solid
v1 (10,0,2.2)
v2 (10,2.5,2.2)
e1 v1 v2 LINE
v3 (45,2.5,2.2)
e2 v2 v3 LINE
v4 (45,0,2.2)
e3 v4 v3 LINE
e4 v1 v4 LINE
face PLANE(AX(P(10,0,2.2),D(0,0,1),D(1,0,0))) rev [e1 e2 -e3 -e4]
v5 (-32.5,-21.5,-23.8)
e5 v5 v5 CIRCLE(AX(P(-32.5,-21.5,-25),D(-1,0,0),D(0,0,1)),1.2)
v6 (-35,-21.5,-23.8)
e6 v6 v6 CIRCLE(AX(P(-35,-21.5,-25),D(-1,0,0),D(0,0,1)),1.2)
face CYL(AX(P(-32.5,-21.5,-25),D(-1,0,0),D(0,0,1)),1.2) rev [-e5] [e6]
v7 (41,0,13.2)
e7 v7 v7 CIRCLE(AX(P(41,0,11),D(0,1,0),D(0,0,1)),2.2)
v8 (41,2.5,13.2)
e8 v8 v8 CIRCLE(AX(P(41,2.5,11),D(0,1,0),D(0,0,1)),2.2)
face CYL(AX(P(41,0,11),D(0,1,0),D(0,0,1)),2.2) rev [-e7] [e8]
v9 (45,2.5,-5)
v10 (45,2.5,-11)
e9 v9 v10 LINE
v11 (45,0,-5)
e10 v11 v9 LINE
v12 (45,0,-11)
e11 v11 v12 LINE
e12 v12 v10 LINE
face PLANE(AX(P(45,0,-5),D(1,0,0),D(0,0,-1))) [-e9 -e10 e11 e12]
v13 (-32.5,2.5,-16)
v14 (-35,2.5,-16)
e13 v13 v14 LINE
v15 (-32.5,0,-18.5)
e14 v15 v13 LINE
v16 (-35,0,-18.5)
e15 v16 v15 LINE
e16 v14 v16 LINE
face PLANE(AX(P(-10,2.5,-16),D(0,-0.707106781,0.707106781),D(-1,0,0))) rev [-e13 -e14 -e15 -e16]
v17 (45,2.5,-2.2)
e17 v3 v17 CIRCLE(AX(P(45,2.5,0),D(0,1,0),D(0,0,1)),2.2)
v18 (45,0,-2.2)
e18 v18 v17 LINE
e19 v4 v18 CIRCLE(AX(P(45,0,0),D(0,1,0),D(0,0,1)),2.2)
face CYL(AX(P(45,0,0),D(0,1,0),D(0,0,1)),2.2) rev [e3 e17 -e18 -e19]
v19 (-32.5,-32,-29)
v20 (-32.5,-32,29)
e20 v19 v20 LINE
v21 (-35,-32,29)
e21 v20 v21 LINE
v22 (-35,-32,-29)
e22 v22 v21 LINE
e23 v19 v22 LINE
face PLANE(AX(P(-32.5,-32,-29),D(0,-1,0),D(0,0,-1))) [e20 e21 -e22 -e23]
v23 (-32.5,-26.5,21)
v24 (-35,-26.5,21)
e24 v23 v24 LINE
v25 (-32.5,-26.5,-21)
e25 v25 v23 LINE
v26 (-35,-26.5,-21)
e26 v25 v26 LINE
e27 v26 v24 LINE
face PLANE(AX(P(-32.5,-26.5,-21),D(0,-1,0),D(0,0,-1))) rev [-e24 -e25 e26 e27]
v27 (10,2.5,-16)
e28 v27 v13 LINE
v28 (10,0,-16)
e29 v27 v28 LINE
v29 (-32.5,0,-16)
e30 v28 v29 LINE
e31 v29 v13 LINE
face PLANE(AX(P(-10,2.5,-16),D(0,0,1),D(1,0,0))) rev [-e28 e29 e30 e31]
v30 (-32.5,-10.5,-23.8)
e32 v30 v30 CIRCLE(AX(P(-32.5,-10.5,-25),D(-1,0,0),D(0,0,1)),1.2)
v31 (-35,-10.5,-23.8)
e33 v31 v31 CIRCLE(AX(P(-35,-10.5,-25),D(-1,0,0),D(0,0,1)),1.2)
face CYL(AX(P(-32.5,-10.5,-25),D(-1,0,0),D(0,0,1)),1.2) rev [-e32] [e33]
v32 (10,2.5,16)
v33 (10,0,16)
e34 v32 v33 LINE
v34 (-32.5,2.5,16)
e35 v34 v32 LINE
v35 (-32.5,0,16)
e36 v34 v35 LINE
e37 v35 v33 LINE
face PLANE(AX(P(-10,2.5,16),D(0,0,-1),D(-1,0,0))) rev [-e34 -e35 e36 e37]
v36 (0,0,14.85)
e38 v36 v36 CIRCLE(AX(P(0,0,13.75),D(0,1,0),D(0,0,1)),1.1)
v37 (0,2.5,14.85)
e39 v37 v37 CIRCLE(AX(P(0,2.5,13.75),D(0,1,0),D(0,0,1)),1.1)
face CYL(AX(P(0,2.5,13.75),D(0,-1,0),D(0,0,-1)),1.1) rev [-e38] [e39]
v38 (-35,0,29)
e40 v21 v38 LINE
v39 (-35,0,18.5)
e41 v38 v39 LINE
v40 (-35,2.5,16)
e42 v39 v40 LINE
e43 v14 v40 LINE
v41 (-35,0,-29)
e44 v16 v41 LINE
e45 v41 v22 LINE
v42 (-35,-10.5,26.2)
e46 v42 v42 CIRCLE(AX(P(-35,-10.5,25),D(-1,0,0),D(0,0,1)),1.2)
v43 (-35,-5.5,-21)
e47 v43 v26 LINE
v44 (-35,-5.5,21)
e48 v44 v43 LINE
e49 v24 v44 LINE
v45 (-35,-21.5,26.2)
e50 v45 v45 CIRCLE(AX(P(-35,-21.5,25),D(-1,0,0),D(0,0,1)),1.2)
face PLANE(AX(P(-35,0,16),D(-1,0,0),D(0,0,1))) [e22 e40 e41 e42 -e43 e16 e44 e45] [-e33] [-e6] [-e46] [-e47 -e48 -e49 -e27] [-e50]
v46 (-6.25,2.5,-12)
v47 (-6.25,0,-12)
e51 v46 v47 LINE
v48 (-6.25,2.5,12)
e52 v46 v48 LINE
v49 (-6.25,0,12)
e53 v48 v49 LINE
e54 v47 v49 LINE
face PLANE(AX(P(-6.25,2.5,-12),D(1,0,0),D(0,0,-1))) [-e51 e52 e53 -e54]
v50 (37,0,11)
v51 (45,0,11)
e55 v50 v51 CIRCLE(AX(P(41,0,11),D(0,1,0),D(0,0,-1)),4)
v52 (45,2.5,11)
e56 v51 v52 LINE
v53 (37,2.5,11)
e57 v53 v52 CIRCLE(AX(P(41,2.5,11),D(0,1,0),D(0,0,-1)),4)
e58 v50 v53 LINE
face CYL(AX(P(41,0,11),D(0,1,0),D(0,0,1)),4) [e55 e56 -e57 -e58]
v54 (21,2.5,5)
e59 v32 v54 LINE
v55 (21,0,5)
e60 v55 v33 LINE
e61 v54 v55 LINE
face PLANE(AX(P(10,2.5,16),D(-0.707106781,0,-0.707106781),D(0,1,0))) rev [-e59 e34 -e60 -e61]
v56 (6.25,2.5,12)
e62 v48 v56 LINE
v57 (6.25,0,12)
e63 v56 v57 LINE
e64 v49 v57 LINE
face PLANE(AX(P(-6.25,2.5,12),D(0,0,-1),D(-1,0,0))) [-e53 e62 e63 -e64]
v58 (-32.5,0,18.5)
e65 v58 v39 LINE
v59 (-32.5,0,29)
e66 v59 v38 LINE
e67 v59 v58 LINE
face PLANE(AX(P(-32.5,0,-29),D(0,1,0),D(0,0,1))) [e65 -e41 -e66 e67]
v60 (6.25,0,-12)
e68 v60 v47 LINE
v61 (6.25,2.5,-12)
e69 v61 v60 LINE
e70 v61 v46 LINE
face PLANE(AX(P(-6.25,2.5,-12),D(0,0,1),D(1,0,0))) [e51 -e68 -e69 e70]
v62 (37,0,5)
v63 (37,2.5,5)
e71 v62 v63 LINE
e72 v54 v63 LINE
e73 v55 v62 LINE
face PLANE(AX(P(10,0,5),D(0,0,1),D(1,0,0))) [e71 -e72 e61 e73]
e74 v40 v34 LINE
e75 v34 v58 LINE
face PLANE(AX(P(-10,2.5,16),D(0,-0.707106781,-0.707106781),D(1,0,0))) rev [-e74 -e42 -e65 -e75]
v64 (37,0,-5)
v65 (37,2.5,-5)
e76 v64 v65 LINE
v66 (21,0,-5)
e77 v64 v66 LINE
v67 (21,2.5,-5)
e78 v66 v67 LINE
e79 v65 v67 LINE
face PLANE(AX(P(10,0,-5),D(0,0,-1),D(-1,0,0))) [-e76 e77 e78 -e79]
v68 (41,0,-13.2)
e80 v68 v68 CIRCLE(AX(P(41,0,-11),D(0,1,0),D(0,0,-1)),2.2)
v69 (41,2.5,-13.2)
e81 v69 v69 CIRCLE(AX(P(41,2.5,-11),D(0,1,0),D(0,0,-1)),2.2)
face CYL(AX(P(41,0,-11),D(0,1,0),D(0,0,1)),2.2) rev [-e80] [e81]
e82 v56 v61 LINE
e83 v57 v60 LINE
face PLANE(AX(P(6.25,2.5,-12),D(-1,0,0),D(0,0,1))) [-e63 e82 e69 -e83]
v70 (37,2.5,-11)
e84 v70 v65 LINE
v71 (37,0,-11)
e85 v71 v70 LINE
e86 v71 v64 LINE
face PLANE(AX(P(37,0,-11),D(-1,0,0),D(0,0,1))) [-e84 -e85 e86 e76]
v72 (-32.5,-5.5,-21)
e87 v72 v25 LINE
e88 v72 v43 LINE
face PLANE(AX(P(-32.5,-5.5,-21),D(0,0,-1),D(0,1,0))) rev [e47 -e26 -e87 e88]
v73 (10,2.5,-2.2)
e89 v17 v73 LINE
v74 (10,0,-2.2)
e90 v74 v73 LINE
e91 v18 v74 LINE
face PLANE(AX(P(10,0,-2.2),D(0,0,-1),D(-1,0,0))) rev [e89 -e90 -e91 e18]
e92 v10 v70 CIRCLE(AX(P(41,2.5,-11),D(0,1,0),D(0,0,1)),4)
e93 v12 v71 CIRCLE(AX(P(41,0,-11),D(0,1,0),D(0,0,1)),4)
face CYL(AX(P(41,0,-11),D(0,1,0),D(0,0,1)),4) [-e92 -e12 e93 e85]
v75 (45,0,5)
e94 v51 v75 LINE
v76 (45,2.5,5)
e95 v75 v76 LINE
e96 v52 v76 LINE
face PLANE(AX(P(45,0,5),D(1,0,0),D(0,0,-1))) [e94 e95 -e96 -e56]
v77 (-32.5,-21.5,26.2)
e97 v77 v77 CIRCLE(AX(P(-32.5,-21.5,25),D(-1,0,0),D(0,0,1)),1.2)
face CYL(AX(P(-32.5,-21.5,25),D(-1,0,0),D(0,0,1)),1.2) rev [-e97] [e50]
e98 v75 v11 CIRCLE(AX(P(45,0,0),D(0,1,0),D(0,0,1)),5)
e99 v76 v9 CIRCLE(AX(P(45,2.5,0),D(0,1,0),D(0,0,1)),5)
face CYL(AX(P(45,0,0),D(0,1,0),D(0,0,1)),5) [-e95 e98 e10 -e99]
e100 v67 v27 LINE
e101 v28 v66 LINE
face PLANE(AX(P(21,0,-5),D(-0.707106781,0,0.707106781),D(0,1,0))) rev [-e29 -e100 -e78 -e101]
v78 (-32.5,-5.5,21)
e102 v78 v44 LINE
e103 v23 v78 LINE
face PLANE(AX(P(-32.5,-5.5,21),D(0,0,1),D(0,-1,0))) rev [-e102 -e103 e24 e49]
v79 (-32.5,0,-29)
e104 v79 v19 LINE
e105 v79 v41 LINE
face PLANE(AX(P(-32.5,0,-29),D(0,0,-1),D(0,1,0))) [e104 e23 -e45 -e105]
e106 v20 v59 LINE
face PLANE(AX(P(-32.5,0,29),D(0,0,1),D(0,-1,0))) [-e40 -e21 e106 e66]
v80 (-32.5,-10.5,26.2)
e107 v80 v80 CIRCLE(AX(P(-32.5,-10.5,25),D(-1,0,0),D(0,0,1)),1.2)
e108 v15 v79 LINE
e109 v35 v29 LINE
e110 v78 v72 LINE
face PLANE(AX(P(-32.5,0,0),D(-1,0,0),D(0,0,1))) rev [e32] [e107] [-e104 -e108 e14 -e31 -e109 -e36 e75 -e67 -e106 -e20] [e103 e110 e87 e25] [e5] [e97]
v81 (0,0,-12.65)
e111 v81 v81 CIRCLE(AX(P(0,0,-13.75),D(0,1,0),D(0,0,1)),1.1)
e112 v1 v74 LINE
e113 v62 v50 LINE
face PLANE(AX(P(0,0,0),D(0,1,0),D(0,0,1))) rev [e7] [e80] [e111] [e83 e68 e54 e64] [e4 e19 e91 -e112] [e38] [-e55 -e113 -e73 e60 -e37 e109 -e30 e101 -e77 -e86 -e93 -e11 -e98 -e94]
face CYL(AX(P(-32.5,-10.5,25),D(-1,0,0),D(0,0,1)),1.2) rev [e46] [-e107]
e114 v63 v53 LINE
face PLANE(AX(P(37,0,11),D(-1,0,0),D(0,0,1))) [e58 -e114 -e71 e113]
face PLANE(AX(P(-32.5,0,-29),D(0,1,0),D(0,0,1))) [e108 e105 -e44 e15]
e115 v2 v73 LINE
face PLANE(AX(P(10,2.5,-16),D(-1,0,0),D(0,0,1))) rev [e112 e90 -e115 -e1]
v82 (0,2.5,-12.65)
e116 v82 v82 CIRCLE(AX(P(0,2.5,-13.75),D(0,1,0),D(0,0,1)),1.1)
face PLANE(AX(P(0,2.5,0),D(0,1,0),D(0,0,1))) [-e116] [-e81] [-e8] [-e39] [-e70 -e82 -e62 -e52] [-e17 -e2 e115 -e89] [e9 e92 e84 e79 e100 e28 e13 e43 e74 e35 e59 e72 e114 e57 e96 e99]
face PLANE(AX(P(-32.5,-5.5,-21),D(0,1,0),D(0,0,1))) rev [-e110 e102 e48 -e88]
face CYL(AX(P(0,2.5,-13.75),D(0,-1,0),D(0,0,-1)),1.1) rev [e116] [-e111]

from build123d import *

# Parameters (mm, degrees)
SKETCH1_W           = 20
SKETCH1_H           = 32
SKETCH1_R           = 1.1
SKETCH1_W_2         = 12.5
SKETCH1_H_2         = 24
BOSS_EXTRUDE1_DEPTH = 2.5
BOSS_EXTRUDE2_DEPTH = 2.5
CHAMFER1_SIZE       = 11
SKETCH3_R           = 2.2
BOSS_EXTRUDE3_DEPTH = 2.5
SKETCH4_W           = 25
SKETCH4_H           = 32
BOSS_EXTRUDE4_DEPTH = 2.5
SKETCH5_W           = 58
SKETCH5_H           = 32
SKETCH5_R           = 1.2
SKETCH5_W_2         = 42
SKETCH5_H_2         = 21
BOSS_EXTRUDE5_DEPTH = 2.5
CHAMFER2_SIZE       = 2.5


with BuildPart() as part:
    # Sketch1 → Boss-Extrude1 (new body)
    with BuildSketch(Plane(origin=(0, 0, 0), x_dir=(1, 0, 0), z_dir=(0, 1, 0))):
        Rectangle(SKETCH1_W, SKETCH1_H)
        with Locations(Location((0, -13.75, 0), (0, 0, 270))):
            Circle(SKETCH1_R, mode=Mode.SUBTRACT)
        with Locations(Location((0, 13.75, 0), (0, 0, 270))):
            Circle(SKETCH1_R, mode=Mode.SUBTRACT)
        Rectangle(SKETCH1_W_2, SKETCH1_H_2, mode=Mode.SUBTRACT)
    extrude(amount=BOSS_EXTRUDE1_DEPTH)

    # Sketch2 → Boss-Extrude2 (add)
    with BuildSketch(Plane(origin=(0, 2.5, 0), x_dir=(1, 0, 0), z_dir=(0, 1, 0))):
        with BuildLine():
            Line((10, 5), (45, 5))
            ThreePointArc((45, 5), (50, 0), (45, -5))
            Line((45, -5), (10, -5))
            ThreePointArc((10, -5), (7.942810861, -4.557189139), (6.25, -3.307189139))
            Line((6.25, -3.307189139), (6.25, 3.307189139))
            ThreePointArc((6.25, 3.307189139), (7.942810861, 4.557189139), (10, 5))
        make_face()
        with BuildLine():
            Line((10, 2.2), (45, 2.2))
            ThreePointArc((45, 2.2), (47.2, 0), (45, -2.2))
            Line((45, -2.2), (10, -2.2))
            ThreePointArc((10, -2.2), (7.8, 0), (10, 2.2))
        make_face(mode=Mode.SUBTRACT)
    extrude(amount=-BOSS_EXTRUDE2_DEPTH)

    # Chamfer1
    chamfer1_edges = [part.edges().sort_by_distance(p)[0] for p in [
        (10, 1.25, 5),
        (10, 1.25, -5),
    ]]
    chamfer(chamfer1_edges, length=CHAMFER1_SIZE - 0.0001)  # a hair under: the kernel refuses the full size

    # Sketch3 → Boss-Extrude3 (add)
    # profile 1 of 2: a face of its own
    with BuildSketch(Plane(origin=(0, 2.5, 0), x_dir=(1, 0, 0), z_dir=(0, 1, 0))):
        with BuildLine():
            Line((45, -5), (45, -11))
            ThreePointArc((45, -11), (41, -15), (37, -11))
            Line((37, -11), (37, -5))
            Line((37, -5), (45, -5))
        make_face()
        with Locations(Location((41, -11, 0), (0, 0, 270))):
            Circle(SKETCH3_R, mode=Mode.SUBTRACT)
    # profile 2 of 2: a face of its own
    with BuildSketch(Plane(origin=(0, 2.5, 0), x_dir=(1, 0, 0), z_dir=(0, 1, 0))):
        with BuildLine():
            Line((45, 5), (45, 11))
            ThreePointArc((45, 11), (41, 15), (37, 11))
            Line((37, 11), (37, 5))
            Line((37, 5), (45, 5))
        make_face()
        with Locations(Location((41, 11, 0), (0, 0, 90))):
            Circle(SKETCH3_R, mode=Mode.SUBTRACT)
    extrude(amount=-BOSS_EXTRUDE3_DEPTH)

    # Sketch4 → Boss-Extrude4 (add)
    with BuildSketch(Plane(origin=(0, 2.5, 0), x_dir=(1, 0, 0), z_dir=(0, 1, 0))):
        with Locations((-22.5, 0)):
            Rectangle(SKETCH4_W, SKETCH4_H)
    extrude(amount=-BOSS_EXTRUDE4_DEPTH)

    # Sketch5 → Boss-Extrude5 (add)
    with BuildSketch(Plane.ZY.offset(35)):
        with Locations((0, -16)):
            Rectangle(SKETCH5_W, SKETCH5_H)
        with Locations((25, -10.5)):
            Circle(SKETCH5_R, mode=Mode.SUBTRACT)
        with Locations((25, -21.5)):
            Circle(SKETCH5_R, mode=Mode.SUBTRACT)
        with Locations((-25, -10.5)):
            Circle(SKETCH5_R, mode=Mode.SUBTRACT)
        with Locations((-25, -21.5)):
            Circle(SKETCH5_R, mode=Mode.SUBTRACT)
        with Locations((0, -16)):
            Rectangle(SKETCH5_W_2, SKETCH5_H_2, mode=Mode.SUBTRACT)
    extrude(amount=-BOSS_EXTRUDE5_DEPTH)

    # Chamfer2
    chamfer2_edges = [part.edges().sort_by_distance(p)[0] for p in [
        (-33.75, 0, -16),
        (-33.75, 0, 16),
    ]]
    chamfer(chamfer2_edges, length=CHAMFER2_SIZE - 0.0001)  # a hair under: the kernel refuses the full size


solid = part.part
